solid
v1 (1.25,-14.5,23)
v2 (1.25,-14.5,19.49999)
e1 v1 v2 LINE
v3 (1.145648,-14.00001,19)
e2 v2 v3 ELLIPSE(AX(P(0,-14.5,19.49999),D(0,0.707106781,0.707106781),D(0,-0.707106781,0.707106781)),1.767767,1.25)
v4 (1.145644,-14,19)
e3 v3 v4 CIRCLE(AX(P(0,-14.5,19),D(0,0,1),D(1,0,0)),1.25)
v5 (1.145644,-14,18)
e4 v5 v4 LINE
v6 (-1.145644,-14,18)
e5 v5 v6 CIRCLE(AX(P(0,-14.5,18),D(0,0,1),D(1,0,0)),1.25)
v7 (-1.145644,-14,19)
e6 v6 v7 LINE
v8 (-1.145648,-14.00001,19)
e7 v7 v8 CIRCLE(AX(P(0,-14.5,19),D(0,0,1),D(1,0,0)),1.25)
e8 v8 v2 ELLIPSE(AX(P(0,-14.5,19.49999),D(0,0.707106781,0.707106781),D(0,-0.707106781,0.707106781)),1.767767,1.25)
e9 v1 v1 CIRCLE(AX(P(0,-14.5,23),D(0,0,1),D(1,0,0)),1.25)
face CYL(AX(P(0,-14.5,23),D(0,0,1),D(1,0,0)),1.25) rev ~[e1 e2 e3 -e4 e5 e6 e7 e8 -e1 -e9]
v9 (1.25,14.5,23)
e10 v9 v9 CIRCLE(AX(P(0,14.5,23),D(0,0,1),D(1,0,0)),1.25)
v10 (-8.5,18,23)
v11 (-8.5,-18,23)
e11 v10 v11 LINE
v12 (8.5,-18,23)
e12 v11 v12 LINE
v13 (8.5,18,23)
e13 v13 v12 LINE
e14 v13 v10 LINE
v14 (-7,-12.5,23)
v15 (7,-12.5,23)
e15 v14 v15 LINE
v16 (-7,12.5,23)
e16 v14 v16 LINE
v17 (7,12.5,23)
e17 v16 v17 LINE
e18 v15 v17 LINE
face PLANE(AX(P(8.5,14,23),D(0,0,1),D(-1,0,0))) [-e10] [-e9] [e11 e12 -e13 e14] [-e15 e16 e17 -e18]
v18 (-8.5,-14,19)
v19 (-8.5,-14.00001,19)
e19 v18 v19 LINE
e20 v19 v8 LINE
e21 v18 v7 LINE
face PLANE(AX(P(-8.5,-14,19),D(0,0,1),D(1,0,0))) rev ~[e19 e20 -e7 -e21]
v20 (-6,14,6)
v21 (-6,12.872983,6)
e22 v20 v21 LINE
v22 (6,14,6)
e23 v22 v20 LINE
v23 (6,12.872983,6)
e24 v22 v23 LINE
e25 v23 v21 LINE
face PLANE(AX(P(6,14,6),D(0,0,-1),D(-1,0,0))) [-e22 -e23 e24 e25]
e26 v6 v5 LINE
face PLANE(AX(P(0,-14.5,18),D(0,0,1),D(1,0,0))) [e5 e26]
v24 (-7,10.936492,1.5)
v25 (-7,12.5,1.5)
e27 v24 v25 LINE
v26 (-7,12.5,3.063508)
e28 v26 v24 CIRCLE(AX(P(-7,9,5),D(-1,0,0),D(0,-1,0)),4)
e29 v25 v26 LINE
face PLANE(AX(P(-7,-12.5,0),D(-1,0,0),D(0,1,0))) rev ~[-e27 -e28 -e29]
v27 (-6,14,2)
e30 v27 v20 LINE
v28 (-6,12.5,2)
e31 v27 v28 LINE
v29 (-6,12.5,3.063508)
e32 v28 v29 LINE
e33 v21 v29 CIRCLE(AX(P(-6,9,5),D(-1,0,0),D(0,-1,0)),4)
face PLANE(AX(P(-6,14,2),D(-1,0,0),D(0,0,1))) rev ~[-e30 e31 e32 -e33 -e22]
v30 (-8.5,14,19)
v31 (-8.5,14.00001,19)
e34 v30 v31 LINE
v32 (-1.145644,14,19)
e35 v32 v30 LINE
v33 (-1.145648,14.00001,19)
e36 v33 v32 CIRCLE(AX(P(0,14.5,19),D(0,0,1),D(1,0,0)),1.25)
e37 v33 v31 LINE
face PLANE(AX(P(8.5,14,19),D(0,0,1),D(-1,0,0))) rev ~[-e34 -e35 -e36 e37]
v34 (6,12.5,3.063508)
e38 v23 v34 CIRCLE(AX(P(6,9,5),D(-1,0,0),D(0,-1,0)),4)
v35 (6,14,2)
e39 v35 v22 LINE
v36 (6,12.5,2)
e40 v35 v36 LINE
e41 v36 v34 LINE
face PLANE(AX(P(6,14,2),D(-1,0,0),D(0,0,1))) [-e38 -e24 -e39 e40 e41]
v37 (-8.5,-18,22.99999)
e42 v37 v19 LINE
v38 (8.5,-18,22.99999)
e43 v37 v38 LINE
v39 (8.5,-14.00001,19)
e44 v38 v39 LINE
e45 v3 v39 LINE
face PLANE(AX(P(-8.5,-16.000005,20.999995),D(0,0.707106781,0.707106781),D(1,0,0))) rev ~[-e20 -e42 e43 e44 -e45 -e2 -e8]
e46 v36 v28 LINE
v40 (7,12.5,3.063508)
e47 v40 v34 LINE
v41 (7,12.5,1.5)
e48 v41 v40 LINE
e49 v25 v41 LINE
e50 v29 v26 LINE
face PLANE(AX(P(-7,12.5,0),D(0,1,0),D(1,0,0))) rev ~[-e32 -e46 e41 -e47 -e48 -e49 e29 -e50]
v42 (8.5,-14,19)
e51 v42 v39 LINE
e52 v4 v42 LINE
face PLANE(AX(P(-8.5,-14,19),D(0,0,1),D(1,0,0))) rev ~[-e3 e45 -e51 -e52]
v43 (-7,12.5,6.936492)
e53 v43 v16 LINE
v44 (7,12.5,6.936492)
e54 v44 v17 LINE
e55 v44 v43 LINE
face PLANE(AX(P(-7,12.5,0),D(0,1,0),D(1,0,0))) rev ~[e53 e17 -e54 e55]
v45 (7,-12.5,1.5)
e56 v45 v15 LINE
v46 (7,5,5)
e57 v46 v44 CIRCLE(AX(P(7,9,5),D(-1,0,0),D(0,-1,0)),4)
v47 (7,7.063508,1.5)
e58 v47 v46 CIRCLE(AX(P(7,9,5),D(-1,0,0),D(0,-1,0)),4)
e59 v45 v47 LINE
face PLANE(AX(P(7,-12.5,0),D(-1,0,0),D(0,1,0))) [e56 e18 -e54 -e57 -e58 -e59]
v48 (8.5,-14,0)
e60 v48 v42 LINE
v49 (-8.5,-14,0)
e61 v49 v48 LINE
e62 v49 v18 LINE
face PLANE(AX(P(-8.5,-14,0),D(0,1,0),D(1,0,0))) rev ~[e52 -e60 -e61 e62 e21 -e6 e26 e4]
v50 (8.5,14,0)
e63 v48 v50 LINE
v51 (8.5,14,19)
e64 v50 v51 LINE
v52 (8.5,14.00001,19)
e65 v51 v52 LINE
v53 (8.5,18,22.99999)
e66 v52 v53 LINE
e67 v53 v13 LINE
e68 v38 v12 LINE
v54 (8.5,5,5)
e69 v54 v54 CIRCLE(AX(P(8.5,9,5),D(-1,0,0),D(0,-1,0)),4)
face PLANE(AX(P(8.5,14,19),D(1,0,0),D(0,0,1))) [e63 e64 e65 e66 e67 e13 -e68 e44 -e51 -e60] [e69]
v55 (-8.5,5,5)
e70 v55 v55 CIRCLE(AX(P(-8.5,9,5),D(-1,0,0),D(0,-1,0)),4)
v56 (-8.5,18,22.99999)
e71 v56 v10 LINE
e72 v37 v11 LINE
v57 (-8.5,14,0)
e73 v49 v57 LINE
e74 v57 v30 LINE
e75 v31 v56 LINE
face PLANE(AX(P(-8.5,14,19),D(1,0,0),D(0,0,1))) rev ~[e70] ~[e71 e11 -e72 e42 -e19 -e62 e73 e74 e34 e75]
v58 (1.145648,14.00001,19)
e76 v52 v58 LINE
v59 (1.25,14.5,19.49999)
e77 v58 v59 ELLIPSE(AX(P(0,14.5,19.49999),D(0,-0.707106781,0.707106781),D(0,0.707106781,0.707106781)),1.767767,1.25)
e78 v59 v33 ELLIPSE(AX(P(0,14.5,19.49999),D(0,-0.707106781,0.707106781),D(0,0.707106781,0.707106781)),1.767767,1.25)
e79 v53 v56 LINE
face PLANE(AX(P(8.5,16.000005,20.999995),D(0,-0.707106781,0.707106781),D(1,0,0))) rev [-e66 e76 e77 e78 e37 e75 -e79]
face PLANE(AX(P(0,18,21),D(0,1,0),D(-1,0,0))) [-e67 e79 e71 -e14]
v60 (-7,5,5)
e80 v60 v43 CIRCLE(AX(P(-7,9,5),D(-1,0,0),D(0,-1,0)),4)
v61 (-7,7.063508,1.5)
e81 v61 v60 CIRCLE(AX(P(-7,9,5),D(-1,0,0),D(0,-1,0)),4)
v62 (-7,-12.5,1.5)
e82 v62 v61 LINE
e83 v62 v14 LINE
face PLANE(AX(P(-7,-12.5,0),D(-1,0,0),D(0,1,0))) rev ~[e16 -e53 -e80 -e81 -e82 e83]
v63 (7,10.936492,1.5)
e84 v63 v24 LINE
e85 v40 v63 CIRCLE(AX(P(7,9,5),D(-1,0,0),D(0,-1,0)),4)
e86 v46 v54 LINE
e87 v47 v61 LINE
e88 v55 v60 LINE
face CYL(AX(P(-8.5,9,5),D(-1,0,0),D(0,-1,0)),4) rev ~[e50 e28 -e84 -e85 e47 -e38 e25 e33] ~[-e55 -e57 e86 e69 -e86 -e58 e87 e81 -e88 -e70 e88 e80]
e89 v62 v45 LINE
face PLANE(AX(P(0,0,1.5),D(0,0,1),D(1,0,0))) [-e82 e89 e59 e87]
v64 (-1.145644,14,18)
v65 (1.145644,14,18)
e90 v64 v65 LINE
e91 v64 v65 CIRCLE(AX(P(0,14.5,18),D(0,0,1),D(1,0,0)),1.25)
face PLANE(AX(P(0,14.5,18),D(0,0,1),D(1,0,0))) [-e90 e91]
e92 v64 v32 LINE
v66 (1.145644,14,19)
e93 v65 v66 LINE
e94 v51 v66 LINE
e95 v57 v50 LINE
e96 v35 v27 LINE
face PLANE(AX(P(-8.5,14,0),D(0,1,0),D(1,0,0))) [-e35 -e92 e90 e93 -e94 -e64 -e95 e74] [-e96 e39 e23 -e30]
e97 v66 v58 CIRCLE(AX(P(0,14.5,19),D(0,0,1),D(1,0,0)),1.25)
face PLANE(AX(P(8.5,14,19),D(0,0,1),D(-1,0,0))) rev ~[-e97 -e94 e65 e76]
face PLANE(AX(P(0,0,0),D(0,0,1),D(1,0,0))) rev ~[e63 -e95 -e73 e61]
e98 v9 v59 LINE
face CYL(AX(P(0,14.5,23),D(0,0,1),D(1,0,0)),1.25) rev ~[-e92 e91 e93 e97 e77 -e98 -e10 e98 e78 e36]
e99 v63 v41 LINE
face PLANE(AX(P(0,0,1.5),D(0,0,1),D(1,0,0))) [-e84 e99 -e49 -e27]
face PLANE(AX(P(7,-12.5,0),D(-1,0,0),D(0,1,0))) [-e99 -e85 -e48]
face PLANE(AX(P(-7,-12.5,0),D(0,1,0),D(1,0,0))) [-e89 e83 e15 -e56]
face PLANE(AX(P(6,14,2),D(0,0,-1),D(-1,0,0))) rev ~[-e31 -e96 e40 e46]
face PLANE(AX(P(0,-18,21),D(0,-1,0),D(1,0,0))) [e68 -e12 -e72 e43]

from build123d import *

# Parameters (mm, degrees)
F0_W      = 17
F0_H      = 28
F0_W_2    = 14
F0_H_2    = 25
F1_DEPTH  = 23
F2_DEPTH  = 1.5
F3_W      = 17
F3_H      = 4
F4_DEPTH  = 4
F5_W      = 17
F5_H      = 4
F6_DEPTH  = 4
F5_W_2    = 12
F7_DEPTH  = 1.5
F8_SIZE   = 3.99999
F9_R      = 1.25
F10_DEPTH = 5
F11_R     = 4
F12_DEPTH = 25


# Not quite as in the source:
# - a fillet or chamfer is up to 0.001 mm smaller than in the source, because OpenCascade refuses the exact size


with BuildPart() as f1:
    # F0 (on Top) → F1 (new body)
    with BuildSketch(Plane.XY):
        Rectangle(F0_W, F0_H)
        Rectangle(F0_W_2, F0_H_2, mode=Mode.SUBTRACT)
    extrude(amount=F1_DEPTH)

    # F0 (on Top) → F2 (join)
    with BuildSketch(Plane.XY):
        Rectangle(F0_W_2, F0_H_2)
    extrude(amount=F2_DEPTH)

    # F3 (on face) → F4 (join)
    with BuildSketch(Plane.XZ.offset(14)):
        with Locations((0, 21)):
            Rectangle(F3_W, F3_H)
    extrude(amount=F4_DEPTH)

    # F5 (on face) → F6 (join)
    with BuildSketch(Plane(origin=(0, 14, 0), x_dir=(-1, 0, 0), z_dir=(0, 1, 0))):
        with Locations((0, 21)):
            Rectangle(F5_W, F5_H)
    extrude(amount=F6_DEPTH)

    # F5 (on face) → F7 (cut, through all)
    with BuildSketch(Plane(origin=(0, 14, 0), x_dir=(-1, 0, 0), z_dir=(0, 1, 0))):
        with Locations((0, 4)):
            Rectangle(F5_W_2, F5_H)
    extrude(amount=-F7_DEPTH, mode=Mode.SUBTRACT)

    # F8 (size 4 in the source; OpenCascade refuses exactly that, so slightly less here)
    f8_edges = [f1.edges().sort_by_distance(p)[0] for p in [
        (0, 18, 19),
        (0, -18, 19),
    ]]
    chamfer(f8_edges, length=F8_SIZE)

    # F9 (on face) → F10 (cut)
    with BuildSketch(Plane.XY.offset(23)):
        with Locations((0, 14.5)):
            Circle(F9_R)
        with Locations((0, -14.5)):
            Circle(F9_R)
    extrude(amount=-F10_DEPTH, mode=Mode.SUBTRACT)

    # F11 (on face) → F12 (cut)
    with BuildSketch(Plane(origin=(-8.5, 0, 0), x_dir=(0, -1, 0), z_dir=(-1, 0, 0))):
        with Locations((-9, 5)):
            Circle(F11_R)
    extrude(amount=-F12_DEPTH, mode=Mode.SUBTRACT)


solid = f1.part
